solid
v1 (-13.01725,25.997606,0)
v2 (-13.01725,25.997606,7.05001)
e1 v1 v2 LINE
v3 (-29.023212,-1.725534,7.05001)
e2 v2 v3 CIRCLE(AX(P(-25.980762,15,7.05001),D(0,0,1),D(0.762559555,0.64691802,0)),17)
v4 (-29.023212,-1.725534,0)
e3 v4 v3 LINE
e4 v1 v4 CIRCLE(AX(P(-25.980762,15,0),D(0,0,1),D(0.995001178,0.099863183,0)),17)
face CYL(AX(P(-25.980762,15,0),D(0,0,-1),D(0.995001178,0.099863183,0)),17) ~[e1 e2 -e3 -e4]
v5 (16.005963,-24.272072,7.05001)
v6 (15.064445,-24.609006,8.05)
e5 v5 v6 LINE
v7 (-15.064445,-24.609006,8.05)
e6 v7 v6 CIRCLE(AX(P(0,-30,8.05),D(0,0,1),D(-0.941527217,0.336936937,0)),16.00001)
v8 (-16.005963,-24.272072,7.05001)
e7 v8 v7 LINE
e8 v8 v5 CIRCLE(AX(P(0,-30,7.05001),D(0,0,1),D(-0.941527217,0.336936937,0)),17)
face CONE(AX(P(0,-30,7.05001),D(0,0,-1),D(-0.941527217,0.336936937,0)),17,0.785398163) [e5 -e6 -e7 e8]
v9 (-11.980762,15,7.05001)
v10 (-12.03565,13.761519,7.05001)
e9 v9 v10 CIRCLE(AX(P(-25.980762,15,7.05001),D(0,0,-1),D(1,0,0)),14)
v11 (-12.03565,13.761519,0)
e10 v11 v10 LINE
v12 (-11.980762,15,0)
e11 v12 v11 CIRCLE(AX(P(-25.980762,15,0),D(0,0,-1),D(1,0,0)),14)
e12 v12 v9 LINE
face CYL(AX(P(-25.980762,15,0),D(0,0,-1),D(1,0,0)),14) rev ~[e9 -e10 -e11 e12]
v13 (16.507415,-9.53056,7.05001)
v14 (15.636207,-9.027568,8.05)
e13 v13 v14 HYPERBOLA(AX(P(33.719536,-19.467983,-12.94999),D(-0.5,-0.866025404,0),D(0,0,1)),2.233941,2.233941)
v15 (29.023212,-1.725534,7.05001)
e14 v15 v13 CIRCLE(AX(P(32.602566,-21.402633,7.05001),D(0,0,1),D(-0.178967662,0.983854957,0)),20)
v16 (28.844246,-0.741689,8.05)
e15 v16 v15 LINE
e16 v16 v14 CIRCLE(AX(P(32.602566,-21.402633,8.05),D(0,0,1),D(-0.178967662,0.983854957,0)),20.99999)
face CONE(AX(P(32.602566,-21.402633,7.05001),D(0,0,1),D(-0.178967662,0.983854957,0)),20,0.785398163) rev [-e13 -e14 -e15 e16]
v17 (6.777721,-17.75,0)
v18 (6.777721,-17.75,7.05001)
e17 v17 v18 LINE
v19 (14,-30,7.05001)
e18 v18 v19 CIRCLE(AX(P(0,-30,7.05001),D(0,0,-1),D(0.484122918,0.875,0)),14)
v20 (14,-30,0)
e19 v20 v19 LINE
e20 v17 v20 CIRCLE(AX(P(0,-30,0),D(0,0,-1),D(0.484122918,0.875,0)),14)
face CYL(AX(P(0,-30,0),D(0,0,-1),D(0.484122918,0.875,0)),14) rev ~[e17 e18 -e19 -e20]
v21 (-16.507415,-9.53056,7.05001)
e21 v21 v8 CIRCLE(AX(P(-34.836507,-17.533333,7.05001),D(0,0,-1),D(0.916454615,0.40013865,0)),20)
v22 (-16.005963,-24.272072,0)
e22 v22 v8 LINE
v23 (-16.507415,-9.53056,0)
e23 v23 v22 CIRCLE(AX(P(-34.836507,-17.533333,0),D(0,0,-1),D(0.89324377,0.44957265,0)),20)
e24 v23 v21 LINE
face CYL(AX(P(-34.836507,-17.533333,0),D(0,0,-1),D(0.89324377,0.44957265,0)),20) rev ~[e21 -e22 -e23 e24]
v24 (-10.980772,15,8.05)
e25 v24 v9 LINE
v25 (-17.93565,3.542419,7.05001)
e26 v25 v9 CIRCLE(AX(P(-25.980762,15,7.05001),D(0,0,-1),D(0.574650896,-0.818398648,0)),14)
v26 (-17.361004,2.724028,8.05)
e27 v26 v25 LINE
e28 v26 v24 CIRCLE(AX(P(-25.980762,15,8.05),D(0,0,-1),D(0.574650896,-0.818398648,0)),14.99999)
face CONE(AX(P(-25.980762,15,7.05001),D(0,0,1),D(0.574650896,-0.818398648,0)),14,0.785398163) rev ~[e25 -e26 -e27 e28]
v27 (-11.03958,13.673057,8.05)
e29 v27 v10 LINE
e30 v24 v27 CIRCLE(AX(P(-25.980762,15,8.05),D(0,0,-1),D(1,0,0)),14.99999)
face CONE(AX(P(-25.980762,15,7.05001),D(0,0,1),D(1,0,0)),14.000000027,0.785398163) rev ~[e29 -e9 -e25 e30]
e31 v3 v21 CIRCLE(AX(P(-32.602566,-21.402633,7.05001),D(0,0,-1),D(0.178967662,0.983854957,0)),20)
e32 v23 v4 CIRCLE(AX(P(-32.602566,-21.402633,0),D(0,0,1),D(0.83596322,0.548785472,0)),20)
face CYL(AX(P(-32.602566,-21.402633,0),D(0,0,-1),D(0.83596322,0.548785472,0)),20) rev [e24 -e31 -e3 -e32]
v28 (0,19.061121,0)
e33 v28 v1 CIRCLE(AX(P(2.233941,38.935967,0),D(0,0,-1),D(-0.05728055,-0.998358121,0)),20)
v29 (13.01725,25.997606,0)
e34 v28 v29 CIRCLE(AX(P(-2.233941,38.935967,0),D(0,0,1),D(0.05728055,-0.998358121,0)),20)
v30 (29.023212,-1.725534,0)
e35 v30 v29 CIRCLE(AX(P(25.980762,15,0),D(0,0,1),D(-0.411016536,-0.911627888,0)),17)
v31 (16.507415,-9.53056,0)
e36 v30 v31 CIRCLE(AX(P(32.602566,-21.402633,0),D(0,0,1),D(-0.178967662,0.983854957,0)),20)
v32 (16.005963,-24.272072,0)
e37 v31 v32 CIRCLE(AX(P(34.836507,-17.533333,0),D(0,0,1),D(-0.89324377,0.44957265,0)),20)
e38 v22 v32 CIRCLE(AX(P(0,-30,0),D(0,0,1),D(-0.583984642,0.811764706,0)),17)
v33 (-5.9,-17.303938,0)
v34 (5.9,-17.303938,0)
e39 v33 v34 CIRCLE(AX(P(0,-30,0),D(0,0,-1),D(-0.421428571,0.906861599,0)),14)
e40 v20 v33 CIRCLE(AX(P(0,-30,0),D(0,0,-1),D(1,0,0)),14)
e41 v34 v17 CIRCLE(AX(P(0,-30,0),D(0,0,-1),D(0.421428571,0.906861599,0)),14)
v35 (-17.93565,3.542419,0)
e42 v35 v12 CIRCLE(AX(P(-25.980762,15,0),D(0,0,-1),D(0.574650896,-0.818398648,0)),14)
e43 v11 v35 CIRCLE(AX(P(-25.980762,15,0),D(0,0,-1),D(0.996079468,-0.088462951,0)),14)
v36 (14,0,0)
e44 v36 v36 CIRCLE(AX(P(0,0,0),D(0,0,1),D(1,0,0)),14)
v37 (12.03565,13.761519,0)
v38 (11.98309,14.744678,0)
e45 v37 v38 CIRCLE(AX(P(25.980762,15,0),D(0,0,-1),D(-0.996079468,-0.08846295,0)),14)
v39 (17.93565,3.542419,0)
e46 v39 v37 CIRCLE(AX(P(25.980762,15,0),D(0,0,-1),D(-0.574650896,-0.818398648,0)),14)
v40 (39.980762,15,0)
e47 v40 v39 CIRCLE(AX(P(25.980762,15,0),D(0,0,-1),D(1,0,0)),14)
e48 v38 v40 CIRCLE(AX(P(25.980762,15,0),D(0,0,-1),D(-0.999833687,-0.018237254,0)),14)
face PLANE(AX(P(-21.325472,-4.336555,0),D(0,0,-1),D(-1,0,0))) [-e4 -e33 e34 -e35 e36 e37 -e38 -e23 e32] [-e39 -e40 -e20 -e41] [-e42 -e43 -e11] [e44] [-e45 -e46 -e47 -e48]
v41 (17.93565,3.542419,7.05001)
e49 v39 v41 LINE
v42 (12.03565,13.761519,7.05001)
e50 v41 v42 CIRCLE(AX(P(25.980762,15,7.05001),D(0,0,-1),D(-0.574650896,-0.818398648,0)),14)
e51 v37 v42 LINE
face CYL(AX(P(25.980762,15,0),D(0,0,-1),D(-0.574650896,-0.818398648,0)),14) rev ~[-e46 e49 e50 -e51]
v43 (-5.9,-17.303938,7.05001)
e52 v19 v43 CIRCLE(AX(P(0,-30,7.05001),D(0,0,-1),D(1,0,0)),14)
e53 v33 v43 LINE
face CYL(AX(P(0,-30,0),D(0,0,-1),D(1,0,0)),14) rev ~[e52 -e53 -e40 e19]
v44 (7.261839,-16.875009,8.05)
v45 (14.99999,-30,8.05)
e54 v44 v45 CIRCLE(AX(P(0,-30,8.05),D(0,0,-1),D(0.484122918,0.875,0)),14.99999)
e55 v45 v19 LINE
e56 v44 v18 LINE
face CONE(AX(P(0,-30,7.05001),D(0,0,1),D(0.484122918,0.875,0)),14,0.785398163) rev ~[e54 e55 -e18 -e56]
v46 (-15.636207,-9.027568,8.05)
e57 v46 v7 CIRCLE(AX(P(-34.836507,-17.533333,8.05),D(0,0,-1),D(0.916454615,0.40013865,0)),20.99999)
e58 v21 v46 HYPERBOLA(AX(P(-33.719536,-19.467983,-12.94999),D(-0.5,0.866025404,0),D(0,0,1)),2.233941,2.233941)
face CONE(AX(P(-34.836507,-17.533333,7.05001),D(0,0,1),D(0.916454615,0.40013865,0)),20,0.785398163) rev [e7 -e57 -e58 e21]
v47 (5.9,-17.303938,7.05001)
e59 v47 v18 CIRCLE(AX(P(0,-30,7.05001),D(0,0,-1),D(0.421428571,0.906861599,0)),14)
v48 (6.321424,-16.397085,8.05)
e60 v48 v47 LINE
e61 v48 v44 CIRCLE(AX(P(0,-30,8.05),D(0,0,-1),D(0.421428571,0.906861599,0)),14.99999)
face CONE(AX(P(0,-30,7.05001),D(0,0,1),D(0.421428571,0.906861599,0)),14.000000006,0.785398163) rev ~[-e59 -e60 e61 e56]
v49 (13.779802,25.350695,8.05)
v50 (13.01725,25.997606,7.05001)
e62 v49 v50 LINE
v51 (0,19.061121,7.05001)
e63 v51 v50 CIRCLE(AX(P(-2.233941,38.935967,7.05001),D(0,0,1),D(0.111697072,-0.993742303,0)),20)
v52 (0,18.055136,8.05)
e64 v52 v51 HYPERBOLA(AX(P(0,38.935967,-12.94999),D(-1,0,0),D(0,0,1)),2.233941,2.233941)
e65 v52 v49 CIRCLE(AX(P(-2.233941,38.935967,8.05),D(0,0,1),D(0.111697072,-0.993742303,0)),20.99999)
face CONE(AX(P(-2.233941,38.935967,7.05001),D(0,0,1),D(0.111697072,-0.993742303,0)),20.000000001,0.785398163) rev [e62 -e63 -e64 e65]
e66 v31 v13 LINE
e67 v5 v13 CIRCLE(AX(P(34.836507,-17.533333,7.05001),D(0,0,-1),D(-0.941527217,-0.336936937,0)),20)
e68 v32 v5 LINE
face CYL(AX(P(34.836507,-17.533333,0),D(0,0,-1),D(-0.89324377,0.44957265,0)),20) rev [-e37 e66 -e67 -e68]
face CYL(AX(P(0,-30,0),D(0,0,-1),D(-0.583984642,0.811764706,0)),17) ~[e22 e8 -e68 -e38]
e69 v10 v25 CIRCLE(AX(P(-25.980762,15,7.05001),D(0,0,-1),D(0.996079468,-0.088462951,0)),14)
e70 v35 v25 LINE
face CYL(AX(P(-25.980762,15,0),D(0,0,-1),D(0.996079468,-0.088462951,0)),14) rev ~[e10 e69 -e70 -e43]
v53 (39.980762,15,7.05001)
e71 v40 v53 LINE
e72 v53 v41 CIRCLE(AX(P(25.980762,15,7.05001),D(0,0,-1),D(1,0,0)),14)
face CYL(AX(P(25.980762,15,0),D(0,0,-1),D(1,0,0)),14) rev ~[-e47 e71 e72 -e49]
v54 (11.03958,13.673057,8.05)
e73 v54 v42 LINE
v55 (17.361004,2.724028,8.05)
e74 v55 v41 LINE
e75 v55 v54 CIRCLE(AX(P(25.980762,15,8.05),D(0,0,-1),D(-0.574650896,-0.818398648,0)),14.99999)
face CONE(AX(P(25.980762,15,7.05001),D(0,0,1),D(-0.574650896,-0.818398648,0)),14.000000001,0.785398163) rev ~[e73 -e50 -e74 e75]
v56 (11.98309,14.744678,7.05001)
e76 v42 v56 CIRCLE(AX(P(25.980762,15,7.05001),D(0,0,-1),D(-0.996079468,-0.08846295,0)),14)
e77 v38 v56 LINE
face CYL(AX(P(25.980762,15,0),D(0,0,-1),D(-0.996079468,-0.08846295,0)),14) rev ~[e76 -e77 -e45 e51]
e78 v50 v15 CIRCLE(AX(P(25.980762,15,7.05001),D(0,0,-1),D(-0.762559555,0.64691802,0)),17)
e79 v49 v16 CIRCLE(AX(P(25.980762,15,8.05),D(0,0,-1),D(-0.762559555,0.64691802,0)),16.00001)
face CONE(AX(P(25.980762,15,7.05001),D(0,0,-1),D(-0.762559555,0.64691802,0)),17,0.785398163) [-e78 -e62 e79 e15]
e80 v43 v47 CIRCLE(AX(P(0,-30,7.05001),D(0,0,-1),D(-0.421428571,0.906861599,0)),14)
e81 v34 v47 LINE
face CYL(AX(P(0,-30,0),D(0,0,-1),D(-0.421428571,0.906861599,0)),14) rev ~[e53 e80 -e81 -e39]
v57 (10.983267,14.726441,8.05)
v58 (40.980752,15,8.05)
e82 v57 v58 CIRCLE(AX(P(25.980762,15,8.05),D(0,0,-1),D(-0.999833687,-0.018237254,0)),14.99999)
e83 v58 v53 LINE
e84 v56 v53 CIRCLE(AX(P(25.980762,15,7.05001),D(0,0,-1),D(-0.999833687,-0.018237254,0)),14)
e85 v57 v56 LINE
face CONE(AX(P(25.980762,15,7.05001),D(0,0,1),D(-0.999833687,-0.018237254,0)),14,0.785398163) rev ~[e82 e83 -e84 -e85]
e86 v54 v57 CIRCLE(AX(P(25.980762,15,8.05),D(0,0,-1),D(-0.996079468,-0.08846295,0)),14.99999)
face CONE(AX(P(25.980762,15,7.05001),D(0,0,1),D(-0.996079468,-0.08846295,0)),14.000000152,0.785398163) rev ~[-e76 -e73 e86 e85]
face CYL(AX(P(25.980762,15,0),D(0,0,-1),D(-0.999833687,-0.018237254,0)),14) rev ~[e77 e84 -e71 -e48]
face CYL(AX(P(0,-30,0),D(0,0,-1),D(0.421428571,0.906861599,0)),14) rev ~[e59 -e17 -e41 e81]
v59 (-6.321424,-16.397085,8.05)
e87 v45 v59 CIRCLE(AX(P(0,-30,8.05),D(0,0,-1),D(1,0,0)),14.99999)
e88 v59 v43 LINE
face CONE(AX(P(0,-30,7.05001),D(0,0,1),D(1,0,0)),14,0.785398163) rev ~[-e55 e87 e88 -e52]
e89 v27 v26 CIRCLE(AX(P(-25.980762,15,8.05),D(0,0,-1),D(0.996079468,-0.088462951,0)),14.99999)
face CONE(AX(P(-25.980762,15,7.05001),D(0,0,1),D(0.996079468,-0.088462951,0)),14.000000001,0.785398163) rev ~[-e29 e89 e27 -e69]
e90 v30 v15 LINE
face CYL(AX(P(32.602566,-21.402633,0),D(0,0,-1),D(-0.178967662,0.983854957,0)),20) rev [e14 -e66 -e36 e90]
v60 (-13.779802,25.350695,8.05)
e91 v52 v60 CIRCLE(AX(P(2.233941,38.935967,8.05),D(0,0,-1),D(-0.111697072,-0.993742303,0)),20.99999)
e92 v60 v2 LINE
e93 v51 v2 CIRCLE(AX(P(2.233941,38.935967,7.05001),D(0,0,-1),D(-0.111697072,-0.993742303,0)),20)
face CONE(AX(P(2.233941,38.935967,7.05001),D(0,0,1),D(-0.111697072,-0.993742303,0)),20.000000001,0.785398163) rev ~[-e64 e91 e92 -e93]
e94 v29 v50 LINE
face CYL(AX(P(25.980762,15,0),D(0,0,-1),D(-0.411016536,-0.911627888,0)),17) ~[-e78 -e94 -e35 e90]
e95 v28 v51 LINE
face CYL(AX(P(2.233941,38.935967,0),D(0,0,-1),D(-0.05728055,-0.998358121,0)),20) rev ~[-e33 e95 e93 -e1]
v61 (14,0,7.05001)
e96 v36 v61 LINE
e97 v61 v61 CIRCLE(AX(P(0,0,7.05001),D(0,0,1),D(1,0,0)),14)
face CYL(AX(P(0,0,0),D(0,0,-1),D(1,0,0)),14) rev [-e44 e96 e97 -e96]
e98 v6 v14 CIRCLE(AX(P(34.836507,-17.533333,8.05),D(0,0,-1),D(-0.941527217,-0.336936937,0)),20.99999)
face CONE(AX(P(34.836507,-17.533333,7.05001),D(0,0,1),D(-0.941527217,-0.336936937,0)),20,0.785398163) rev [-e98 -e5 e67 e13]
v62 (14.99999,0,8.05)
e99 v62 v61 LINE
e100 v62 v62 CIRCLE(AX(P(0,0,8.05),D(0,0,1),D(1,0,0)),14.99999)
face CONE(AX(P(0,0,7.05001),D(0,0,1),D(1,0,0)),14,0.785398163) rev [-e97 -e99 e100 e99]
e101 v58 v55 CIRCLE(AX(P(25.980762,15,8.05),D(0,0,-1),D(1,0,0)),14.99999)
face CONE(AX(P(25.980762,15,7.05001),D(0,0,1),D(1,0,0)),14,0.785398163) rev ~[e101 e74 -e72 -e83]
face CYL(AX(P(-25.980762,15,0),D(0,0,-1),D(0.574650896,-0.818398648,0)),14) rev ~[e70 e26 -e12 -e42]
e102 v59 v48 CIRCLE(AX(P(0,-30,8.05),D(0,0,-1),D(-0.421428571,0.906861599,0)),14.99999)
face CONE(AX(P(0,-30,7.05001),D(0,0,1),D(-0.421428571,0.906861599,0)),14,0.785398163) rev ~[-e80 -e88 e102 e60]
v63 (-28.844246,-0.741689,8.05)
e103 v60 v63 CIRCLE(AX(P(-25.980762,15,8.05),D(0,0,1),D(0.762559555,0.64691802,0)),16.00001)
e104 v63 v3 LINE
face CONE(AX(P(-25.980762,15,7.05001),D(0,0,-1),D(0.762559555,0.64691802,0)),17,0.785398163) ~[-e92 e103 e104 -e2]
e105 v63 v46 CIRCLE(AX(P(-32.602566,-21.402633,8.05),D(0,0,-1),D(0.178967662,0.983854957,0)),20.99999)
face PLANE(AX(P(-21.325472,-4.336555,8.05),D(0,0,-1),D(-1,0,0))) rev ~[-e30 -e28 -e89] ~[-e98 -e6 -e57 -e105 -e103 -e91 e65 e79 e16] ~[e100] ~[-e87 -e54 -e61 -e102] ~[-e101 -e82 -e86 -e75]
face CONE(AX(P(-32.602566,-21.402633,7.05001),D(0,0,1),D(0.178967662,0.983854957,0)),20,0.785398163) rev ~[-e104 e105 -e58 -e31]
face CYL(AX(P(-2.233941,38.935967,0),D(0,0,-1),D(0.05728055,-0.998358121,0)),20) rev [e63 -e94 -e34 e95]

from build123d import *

# Parameters (mm, degrees)
F0_R        = 14
F1_DEPTH    = 8.05
F2_T1_DEPTH = 8.05
F3_SIZE     = 0.99999


# Not quite as in the source:
# - a fillet or chamfer that OpenCascade refuses, or shapes differently, is made with other operations: its cross-section is extruded or revolved along the edge and cut away or added
# - a fillet or chamfer is up to 0.001 mm smaller than in the source, because OpenCascade refuses the exact size


with BuildPart() as f1:
    # F0 (on Top) → F1 (new body)
    with BuildSketch(Plane.XY):
        with BuildLine():
            ThreePointArc((-18.9934809997, -0.4976741041), (-16.4544826719, -9.5), (-9.9277389168, -16.2))
            ThreePointArc((-9.9277389168, -16.2), (0, -47), (9.9277389168, -16.2))
            ThreePointArc((9.9277389168, -16.2), (16.4544826719, -9.5), (18.9934809997, -0.4976741041))
            ThreePointArc((18.9934809997, -0.4976741041), (40.7031939779, 23.5), (9.0657420829, 16.6976741041))
            ThreePointArc((9.0657420829, 16.6976741041), (0, 19), (-9.0657420829, 16.6976741041))
            ThreePointArc((-9.0657420829, 16.6976741041), (-40.7031939779, 23.5), (-18.9934809997, -0.4976741041))
        make_face()
        with BuildLine():
            ThreePointArc((5.9, -17.3039376183), (6.3427828622, -17.5192506009), (6.7777208559, -17.75))
            ThreePointArc((6.7777208559, -17.75), (12.0600184905, -22.8897289778), (14, -30))
            ThreePointArc((14, -30), (-7.5299402388, -41.8025420991), (-5.9, -17.3039376183))
            ThreePointArc((-5.9, -17.3039376183), (0, -16), (5.9, -17.3039376183))
        make_face(mode=Mode.SUBTRACT)
        with BuildLine():
            ThreePointArc((-17.9356495629, 3.5424189268), (-38.4031526988, 21.4563311676), (-11.9807621135, 15))
            ThreePointArc((-11.9807621135, 15), (-11.9944907071, 14.3801515137), (-12.0356495629, 13.7615186915))
            ThreePointArc((-12.0356495629, 13.7615186915), (-13.8564064606, 8), (-17.9356495629, 3.5424189268))
        make_face(mode=Mode.SUBTRACT)
        Circle(F0_R, mode=Mode.SUBTRACT)
        with BuildLine():
            ThreePointArc((11.9830904892, 14.7446784409), (25.8530960258, 28.999417894), (39.9807621135, 15))
            ThreePointArc((39.9807621135, 15), (32.4370932811, 2.5776094147), (17.9356495629, 3.5424189268))
            ThreePointArc((17.9356495629, 3.5424189268), (13.8564064606, 8), (12.0356495629, 13.7615186915))
            ThreePointArc((12.0356495629, 13.7615186915), (12.0007246446, 14.2526363898), (11.9830904892, 14.7446784409))
        make_face(mode=Mode.SUBTRACT)
    extrude(amount=F1_DEPTH)

    # F2: fillet of radius 20 on 6 edges, made by hand

    # F2_s2 → F2_t1 (join)
    with BuildSketch(Plane.XY):
        with BuildLine():
            ThreePointArc((-15.8833011878, -10.4269239653), (-21.5600561339, -4.7274127209), (-29.0232123622, -1.725534266))
            ThreePointArc((-29.0232123622, -1.725534266), (-23.9150097608, -1.8740234448), (-18.9934809997, -0.4976741041))
            ThreePointArc((-18.9934809997, -0.4976741041), (-18.1313260585, -5.6793499065), (-15.8833011878, -10.4269239653))
        make_face()
        with BuildLine():
            ThreePointArc((-16.9716316312, -8.5418803419), (-14.8740875774, -16.3078499586), (-16.0059626906, -24.2720720721))
            ThreePointArc((-16.0059626906, -24.2720720721), (-13.5804567909, -19.7739942621), (-9.9277389168, -16.2))
            ThreePointArc((-9.9277389168, -16.2), (-13.9841243252, -12.8625140177), (-16.9716316312, -8.5418803419))
        make_face()
        with BuildLine():
            ThreePointArc((-1.0883304434, 18.9688043072), (6.6859685565, 21.0352626795), (13.0172496716, 25.9976063381))
            ThreePointArc((13.0172496716, 25.9976063381), (10.3345529699, 21.648017707), (9.0657420829, 16.6976741041))
            ThreePointArc((9.0657420829, 16.6976741041), (4.1472017333, 18.5418639242), (-1.0883304434, 18.9688043072))
        make_face()
        with BuildLine():
            ThreePointArc((1.0883304434, 18.9688043072), (-6.6859685565, 21.0352626795), (-13.0172496716, 25.9976063381))
            ThreePointArc((-13.0172496716, 25.9976063381), (-10.3345529699, 21.648017707), (-9.0657420829, 16.6976741041))
            ThreePointArc((-9.0657420829, 16.6976741041), (-4.1472017333, 18.5418639242), (1.0883304434, 18.9688043072))
        make_face()
        with BuildLine():
            ThreePointArc((29.0232123622, -1.725534266), (21.5600561339, -4.7274127209), (15.8833011878, -10.4269239653))
            ThreePointArc((15.8833011878, -10.4269239653), (18.1313260585, -5.6793499065), (18.9934809997, -0.4976741041))
            ThreePointArc((18.9934809997, -0.4976741041), (23.9150097608, -1.8740234448), (29.0232123622, -1.725534266))
        make_face()
        with BuildLine():
            ThreePointArc((16.9716316312, -8.5418803419), (14.8740875774, -16.3078499586), (16.0059626906, -24.2720720721))
            ThreePointArc((16.0059626906, -24.2720720721), (13.5804567909, -19.7739942621), (9.9277389168, -16.2))
            ThreePointArc((9.9277389168, -16.2), (13.9841243252, -12.8625140177), (16.9716316312, -8.5418803419))
        make_face()
    extrude(amount=F2_T1_DEPTH)

    # F3 (size 1 in the source; OpenCascade refuses exactly that, so slightly less here)
    f3_edges = [f1.edges().sort_by_distance(p)[0] for p in [
        (0, -47, 8.05),
        (14.848068, -16.8534, 8.05),
        (22.019507, -4.432104, 8.05),
        (40.703194, 23.5, 8.05),
        (7.171439, 21.285504, 8.05),
        (-7.171439, 21.285504, 8.05),
        (-40.703194, 23.5, 8.05),
        (-22.019507, -4.432104, 8.05),
        (-14.848068, -16.8534, 8.05),
        (5.9, -42.696062, 8.05),
        (-39.980762, 15, 8.05),
        (-14, 0, 8.05),
        (11.980762, 15, 8.05),
    ]]
    chamfer(f3_edges, length=F3_SIZE)


solid = f1.part
